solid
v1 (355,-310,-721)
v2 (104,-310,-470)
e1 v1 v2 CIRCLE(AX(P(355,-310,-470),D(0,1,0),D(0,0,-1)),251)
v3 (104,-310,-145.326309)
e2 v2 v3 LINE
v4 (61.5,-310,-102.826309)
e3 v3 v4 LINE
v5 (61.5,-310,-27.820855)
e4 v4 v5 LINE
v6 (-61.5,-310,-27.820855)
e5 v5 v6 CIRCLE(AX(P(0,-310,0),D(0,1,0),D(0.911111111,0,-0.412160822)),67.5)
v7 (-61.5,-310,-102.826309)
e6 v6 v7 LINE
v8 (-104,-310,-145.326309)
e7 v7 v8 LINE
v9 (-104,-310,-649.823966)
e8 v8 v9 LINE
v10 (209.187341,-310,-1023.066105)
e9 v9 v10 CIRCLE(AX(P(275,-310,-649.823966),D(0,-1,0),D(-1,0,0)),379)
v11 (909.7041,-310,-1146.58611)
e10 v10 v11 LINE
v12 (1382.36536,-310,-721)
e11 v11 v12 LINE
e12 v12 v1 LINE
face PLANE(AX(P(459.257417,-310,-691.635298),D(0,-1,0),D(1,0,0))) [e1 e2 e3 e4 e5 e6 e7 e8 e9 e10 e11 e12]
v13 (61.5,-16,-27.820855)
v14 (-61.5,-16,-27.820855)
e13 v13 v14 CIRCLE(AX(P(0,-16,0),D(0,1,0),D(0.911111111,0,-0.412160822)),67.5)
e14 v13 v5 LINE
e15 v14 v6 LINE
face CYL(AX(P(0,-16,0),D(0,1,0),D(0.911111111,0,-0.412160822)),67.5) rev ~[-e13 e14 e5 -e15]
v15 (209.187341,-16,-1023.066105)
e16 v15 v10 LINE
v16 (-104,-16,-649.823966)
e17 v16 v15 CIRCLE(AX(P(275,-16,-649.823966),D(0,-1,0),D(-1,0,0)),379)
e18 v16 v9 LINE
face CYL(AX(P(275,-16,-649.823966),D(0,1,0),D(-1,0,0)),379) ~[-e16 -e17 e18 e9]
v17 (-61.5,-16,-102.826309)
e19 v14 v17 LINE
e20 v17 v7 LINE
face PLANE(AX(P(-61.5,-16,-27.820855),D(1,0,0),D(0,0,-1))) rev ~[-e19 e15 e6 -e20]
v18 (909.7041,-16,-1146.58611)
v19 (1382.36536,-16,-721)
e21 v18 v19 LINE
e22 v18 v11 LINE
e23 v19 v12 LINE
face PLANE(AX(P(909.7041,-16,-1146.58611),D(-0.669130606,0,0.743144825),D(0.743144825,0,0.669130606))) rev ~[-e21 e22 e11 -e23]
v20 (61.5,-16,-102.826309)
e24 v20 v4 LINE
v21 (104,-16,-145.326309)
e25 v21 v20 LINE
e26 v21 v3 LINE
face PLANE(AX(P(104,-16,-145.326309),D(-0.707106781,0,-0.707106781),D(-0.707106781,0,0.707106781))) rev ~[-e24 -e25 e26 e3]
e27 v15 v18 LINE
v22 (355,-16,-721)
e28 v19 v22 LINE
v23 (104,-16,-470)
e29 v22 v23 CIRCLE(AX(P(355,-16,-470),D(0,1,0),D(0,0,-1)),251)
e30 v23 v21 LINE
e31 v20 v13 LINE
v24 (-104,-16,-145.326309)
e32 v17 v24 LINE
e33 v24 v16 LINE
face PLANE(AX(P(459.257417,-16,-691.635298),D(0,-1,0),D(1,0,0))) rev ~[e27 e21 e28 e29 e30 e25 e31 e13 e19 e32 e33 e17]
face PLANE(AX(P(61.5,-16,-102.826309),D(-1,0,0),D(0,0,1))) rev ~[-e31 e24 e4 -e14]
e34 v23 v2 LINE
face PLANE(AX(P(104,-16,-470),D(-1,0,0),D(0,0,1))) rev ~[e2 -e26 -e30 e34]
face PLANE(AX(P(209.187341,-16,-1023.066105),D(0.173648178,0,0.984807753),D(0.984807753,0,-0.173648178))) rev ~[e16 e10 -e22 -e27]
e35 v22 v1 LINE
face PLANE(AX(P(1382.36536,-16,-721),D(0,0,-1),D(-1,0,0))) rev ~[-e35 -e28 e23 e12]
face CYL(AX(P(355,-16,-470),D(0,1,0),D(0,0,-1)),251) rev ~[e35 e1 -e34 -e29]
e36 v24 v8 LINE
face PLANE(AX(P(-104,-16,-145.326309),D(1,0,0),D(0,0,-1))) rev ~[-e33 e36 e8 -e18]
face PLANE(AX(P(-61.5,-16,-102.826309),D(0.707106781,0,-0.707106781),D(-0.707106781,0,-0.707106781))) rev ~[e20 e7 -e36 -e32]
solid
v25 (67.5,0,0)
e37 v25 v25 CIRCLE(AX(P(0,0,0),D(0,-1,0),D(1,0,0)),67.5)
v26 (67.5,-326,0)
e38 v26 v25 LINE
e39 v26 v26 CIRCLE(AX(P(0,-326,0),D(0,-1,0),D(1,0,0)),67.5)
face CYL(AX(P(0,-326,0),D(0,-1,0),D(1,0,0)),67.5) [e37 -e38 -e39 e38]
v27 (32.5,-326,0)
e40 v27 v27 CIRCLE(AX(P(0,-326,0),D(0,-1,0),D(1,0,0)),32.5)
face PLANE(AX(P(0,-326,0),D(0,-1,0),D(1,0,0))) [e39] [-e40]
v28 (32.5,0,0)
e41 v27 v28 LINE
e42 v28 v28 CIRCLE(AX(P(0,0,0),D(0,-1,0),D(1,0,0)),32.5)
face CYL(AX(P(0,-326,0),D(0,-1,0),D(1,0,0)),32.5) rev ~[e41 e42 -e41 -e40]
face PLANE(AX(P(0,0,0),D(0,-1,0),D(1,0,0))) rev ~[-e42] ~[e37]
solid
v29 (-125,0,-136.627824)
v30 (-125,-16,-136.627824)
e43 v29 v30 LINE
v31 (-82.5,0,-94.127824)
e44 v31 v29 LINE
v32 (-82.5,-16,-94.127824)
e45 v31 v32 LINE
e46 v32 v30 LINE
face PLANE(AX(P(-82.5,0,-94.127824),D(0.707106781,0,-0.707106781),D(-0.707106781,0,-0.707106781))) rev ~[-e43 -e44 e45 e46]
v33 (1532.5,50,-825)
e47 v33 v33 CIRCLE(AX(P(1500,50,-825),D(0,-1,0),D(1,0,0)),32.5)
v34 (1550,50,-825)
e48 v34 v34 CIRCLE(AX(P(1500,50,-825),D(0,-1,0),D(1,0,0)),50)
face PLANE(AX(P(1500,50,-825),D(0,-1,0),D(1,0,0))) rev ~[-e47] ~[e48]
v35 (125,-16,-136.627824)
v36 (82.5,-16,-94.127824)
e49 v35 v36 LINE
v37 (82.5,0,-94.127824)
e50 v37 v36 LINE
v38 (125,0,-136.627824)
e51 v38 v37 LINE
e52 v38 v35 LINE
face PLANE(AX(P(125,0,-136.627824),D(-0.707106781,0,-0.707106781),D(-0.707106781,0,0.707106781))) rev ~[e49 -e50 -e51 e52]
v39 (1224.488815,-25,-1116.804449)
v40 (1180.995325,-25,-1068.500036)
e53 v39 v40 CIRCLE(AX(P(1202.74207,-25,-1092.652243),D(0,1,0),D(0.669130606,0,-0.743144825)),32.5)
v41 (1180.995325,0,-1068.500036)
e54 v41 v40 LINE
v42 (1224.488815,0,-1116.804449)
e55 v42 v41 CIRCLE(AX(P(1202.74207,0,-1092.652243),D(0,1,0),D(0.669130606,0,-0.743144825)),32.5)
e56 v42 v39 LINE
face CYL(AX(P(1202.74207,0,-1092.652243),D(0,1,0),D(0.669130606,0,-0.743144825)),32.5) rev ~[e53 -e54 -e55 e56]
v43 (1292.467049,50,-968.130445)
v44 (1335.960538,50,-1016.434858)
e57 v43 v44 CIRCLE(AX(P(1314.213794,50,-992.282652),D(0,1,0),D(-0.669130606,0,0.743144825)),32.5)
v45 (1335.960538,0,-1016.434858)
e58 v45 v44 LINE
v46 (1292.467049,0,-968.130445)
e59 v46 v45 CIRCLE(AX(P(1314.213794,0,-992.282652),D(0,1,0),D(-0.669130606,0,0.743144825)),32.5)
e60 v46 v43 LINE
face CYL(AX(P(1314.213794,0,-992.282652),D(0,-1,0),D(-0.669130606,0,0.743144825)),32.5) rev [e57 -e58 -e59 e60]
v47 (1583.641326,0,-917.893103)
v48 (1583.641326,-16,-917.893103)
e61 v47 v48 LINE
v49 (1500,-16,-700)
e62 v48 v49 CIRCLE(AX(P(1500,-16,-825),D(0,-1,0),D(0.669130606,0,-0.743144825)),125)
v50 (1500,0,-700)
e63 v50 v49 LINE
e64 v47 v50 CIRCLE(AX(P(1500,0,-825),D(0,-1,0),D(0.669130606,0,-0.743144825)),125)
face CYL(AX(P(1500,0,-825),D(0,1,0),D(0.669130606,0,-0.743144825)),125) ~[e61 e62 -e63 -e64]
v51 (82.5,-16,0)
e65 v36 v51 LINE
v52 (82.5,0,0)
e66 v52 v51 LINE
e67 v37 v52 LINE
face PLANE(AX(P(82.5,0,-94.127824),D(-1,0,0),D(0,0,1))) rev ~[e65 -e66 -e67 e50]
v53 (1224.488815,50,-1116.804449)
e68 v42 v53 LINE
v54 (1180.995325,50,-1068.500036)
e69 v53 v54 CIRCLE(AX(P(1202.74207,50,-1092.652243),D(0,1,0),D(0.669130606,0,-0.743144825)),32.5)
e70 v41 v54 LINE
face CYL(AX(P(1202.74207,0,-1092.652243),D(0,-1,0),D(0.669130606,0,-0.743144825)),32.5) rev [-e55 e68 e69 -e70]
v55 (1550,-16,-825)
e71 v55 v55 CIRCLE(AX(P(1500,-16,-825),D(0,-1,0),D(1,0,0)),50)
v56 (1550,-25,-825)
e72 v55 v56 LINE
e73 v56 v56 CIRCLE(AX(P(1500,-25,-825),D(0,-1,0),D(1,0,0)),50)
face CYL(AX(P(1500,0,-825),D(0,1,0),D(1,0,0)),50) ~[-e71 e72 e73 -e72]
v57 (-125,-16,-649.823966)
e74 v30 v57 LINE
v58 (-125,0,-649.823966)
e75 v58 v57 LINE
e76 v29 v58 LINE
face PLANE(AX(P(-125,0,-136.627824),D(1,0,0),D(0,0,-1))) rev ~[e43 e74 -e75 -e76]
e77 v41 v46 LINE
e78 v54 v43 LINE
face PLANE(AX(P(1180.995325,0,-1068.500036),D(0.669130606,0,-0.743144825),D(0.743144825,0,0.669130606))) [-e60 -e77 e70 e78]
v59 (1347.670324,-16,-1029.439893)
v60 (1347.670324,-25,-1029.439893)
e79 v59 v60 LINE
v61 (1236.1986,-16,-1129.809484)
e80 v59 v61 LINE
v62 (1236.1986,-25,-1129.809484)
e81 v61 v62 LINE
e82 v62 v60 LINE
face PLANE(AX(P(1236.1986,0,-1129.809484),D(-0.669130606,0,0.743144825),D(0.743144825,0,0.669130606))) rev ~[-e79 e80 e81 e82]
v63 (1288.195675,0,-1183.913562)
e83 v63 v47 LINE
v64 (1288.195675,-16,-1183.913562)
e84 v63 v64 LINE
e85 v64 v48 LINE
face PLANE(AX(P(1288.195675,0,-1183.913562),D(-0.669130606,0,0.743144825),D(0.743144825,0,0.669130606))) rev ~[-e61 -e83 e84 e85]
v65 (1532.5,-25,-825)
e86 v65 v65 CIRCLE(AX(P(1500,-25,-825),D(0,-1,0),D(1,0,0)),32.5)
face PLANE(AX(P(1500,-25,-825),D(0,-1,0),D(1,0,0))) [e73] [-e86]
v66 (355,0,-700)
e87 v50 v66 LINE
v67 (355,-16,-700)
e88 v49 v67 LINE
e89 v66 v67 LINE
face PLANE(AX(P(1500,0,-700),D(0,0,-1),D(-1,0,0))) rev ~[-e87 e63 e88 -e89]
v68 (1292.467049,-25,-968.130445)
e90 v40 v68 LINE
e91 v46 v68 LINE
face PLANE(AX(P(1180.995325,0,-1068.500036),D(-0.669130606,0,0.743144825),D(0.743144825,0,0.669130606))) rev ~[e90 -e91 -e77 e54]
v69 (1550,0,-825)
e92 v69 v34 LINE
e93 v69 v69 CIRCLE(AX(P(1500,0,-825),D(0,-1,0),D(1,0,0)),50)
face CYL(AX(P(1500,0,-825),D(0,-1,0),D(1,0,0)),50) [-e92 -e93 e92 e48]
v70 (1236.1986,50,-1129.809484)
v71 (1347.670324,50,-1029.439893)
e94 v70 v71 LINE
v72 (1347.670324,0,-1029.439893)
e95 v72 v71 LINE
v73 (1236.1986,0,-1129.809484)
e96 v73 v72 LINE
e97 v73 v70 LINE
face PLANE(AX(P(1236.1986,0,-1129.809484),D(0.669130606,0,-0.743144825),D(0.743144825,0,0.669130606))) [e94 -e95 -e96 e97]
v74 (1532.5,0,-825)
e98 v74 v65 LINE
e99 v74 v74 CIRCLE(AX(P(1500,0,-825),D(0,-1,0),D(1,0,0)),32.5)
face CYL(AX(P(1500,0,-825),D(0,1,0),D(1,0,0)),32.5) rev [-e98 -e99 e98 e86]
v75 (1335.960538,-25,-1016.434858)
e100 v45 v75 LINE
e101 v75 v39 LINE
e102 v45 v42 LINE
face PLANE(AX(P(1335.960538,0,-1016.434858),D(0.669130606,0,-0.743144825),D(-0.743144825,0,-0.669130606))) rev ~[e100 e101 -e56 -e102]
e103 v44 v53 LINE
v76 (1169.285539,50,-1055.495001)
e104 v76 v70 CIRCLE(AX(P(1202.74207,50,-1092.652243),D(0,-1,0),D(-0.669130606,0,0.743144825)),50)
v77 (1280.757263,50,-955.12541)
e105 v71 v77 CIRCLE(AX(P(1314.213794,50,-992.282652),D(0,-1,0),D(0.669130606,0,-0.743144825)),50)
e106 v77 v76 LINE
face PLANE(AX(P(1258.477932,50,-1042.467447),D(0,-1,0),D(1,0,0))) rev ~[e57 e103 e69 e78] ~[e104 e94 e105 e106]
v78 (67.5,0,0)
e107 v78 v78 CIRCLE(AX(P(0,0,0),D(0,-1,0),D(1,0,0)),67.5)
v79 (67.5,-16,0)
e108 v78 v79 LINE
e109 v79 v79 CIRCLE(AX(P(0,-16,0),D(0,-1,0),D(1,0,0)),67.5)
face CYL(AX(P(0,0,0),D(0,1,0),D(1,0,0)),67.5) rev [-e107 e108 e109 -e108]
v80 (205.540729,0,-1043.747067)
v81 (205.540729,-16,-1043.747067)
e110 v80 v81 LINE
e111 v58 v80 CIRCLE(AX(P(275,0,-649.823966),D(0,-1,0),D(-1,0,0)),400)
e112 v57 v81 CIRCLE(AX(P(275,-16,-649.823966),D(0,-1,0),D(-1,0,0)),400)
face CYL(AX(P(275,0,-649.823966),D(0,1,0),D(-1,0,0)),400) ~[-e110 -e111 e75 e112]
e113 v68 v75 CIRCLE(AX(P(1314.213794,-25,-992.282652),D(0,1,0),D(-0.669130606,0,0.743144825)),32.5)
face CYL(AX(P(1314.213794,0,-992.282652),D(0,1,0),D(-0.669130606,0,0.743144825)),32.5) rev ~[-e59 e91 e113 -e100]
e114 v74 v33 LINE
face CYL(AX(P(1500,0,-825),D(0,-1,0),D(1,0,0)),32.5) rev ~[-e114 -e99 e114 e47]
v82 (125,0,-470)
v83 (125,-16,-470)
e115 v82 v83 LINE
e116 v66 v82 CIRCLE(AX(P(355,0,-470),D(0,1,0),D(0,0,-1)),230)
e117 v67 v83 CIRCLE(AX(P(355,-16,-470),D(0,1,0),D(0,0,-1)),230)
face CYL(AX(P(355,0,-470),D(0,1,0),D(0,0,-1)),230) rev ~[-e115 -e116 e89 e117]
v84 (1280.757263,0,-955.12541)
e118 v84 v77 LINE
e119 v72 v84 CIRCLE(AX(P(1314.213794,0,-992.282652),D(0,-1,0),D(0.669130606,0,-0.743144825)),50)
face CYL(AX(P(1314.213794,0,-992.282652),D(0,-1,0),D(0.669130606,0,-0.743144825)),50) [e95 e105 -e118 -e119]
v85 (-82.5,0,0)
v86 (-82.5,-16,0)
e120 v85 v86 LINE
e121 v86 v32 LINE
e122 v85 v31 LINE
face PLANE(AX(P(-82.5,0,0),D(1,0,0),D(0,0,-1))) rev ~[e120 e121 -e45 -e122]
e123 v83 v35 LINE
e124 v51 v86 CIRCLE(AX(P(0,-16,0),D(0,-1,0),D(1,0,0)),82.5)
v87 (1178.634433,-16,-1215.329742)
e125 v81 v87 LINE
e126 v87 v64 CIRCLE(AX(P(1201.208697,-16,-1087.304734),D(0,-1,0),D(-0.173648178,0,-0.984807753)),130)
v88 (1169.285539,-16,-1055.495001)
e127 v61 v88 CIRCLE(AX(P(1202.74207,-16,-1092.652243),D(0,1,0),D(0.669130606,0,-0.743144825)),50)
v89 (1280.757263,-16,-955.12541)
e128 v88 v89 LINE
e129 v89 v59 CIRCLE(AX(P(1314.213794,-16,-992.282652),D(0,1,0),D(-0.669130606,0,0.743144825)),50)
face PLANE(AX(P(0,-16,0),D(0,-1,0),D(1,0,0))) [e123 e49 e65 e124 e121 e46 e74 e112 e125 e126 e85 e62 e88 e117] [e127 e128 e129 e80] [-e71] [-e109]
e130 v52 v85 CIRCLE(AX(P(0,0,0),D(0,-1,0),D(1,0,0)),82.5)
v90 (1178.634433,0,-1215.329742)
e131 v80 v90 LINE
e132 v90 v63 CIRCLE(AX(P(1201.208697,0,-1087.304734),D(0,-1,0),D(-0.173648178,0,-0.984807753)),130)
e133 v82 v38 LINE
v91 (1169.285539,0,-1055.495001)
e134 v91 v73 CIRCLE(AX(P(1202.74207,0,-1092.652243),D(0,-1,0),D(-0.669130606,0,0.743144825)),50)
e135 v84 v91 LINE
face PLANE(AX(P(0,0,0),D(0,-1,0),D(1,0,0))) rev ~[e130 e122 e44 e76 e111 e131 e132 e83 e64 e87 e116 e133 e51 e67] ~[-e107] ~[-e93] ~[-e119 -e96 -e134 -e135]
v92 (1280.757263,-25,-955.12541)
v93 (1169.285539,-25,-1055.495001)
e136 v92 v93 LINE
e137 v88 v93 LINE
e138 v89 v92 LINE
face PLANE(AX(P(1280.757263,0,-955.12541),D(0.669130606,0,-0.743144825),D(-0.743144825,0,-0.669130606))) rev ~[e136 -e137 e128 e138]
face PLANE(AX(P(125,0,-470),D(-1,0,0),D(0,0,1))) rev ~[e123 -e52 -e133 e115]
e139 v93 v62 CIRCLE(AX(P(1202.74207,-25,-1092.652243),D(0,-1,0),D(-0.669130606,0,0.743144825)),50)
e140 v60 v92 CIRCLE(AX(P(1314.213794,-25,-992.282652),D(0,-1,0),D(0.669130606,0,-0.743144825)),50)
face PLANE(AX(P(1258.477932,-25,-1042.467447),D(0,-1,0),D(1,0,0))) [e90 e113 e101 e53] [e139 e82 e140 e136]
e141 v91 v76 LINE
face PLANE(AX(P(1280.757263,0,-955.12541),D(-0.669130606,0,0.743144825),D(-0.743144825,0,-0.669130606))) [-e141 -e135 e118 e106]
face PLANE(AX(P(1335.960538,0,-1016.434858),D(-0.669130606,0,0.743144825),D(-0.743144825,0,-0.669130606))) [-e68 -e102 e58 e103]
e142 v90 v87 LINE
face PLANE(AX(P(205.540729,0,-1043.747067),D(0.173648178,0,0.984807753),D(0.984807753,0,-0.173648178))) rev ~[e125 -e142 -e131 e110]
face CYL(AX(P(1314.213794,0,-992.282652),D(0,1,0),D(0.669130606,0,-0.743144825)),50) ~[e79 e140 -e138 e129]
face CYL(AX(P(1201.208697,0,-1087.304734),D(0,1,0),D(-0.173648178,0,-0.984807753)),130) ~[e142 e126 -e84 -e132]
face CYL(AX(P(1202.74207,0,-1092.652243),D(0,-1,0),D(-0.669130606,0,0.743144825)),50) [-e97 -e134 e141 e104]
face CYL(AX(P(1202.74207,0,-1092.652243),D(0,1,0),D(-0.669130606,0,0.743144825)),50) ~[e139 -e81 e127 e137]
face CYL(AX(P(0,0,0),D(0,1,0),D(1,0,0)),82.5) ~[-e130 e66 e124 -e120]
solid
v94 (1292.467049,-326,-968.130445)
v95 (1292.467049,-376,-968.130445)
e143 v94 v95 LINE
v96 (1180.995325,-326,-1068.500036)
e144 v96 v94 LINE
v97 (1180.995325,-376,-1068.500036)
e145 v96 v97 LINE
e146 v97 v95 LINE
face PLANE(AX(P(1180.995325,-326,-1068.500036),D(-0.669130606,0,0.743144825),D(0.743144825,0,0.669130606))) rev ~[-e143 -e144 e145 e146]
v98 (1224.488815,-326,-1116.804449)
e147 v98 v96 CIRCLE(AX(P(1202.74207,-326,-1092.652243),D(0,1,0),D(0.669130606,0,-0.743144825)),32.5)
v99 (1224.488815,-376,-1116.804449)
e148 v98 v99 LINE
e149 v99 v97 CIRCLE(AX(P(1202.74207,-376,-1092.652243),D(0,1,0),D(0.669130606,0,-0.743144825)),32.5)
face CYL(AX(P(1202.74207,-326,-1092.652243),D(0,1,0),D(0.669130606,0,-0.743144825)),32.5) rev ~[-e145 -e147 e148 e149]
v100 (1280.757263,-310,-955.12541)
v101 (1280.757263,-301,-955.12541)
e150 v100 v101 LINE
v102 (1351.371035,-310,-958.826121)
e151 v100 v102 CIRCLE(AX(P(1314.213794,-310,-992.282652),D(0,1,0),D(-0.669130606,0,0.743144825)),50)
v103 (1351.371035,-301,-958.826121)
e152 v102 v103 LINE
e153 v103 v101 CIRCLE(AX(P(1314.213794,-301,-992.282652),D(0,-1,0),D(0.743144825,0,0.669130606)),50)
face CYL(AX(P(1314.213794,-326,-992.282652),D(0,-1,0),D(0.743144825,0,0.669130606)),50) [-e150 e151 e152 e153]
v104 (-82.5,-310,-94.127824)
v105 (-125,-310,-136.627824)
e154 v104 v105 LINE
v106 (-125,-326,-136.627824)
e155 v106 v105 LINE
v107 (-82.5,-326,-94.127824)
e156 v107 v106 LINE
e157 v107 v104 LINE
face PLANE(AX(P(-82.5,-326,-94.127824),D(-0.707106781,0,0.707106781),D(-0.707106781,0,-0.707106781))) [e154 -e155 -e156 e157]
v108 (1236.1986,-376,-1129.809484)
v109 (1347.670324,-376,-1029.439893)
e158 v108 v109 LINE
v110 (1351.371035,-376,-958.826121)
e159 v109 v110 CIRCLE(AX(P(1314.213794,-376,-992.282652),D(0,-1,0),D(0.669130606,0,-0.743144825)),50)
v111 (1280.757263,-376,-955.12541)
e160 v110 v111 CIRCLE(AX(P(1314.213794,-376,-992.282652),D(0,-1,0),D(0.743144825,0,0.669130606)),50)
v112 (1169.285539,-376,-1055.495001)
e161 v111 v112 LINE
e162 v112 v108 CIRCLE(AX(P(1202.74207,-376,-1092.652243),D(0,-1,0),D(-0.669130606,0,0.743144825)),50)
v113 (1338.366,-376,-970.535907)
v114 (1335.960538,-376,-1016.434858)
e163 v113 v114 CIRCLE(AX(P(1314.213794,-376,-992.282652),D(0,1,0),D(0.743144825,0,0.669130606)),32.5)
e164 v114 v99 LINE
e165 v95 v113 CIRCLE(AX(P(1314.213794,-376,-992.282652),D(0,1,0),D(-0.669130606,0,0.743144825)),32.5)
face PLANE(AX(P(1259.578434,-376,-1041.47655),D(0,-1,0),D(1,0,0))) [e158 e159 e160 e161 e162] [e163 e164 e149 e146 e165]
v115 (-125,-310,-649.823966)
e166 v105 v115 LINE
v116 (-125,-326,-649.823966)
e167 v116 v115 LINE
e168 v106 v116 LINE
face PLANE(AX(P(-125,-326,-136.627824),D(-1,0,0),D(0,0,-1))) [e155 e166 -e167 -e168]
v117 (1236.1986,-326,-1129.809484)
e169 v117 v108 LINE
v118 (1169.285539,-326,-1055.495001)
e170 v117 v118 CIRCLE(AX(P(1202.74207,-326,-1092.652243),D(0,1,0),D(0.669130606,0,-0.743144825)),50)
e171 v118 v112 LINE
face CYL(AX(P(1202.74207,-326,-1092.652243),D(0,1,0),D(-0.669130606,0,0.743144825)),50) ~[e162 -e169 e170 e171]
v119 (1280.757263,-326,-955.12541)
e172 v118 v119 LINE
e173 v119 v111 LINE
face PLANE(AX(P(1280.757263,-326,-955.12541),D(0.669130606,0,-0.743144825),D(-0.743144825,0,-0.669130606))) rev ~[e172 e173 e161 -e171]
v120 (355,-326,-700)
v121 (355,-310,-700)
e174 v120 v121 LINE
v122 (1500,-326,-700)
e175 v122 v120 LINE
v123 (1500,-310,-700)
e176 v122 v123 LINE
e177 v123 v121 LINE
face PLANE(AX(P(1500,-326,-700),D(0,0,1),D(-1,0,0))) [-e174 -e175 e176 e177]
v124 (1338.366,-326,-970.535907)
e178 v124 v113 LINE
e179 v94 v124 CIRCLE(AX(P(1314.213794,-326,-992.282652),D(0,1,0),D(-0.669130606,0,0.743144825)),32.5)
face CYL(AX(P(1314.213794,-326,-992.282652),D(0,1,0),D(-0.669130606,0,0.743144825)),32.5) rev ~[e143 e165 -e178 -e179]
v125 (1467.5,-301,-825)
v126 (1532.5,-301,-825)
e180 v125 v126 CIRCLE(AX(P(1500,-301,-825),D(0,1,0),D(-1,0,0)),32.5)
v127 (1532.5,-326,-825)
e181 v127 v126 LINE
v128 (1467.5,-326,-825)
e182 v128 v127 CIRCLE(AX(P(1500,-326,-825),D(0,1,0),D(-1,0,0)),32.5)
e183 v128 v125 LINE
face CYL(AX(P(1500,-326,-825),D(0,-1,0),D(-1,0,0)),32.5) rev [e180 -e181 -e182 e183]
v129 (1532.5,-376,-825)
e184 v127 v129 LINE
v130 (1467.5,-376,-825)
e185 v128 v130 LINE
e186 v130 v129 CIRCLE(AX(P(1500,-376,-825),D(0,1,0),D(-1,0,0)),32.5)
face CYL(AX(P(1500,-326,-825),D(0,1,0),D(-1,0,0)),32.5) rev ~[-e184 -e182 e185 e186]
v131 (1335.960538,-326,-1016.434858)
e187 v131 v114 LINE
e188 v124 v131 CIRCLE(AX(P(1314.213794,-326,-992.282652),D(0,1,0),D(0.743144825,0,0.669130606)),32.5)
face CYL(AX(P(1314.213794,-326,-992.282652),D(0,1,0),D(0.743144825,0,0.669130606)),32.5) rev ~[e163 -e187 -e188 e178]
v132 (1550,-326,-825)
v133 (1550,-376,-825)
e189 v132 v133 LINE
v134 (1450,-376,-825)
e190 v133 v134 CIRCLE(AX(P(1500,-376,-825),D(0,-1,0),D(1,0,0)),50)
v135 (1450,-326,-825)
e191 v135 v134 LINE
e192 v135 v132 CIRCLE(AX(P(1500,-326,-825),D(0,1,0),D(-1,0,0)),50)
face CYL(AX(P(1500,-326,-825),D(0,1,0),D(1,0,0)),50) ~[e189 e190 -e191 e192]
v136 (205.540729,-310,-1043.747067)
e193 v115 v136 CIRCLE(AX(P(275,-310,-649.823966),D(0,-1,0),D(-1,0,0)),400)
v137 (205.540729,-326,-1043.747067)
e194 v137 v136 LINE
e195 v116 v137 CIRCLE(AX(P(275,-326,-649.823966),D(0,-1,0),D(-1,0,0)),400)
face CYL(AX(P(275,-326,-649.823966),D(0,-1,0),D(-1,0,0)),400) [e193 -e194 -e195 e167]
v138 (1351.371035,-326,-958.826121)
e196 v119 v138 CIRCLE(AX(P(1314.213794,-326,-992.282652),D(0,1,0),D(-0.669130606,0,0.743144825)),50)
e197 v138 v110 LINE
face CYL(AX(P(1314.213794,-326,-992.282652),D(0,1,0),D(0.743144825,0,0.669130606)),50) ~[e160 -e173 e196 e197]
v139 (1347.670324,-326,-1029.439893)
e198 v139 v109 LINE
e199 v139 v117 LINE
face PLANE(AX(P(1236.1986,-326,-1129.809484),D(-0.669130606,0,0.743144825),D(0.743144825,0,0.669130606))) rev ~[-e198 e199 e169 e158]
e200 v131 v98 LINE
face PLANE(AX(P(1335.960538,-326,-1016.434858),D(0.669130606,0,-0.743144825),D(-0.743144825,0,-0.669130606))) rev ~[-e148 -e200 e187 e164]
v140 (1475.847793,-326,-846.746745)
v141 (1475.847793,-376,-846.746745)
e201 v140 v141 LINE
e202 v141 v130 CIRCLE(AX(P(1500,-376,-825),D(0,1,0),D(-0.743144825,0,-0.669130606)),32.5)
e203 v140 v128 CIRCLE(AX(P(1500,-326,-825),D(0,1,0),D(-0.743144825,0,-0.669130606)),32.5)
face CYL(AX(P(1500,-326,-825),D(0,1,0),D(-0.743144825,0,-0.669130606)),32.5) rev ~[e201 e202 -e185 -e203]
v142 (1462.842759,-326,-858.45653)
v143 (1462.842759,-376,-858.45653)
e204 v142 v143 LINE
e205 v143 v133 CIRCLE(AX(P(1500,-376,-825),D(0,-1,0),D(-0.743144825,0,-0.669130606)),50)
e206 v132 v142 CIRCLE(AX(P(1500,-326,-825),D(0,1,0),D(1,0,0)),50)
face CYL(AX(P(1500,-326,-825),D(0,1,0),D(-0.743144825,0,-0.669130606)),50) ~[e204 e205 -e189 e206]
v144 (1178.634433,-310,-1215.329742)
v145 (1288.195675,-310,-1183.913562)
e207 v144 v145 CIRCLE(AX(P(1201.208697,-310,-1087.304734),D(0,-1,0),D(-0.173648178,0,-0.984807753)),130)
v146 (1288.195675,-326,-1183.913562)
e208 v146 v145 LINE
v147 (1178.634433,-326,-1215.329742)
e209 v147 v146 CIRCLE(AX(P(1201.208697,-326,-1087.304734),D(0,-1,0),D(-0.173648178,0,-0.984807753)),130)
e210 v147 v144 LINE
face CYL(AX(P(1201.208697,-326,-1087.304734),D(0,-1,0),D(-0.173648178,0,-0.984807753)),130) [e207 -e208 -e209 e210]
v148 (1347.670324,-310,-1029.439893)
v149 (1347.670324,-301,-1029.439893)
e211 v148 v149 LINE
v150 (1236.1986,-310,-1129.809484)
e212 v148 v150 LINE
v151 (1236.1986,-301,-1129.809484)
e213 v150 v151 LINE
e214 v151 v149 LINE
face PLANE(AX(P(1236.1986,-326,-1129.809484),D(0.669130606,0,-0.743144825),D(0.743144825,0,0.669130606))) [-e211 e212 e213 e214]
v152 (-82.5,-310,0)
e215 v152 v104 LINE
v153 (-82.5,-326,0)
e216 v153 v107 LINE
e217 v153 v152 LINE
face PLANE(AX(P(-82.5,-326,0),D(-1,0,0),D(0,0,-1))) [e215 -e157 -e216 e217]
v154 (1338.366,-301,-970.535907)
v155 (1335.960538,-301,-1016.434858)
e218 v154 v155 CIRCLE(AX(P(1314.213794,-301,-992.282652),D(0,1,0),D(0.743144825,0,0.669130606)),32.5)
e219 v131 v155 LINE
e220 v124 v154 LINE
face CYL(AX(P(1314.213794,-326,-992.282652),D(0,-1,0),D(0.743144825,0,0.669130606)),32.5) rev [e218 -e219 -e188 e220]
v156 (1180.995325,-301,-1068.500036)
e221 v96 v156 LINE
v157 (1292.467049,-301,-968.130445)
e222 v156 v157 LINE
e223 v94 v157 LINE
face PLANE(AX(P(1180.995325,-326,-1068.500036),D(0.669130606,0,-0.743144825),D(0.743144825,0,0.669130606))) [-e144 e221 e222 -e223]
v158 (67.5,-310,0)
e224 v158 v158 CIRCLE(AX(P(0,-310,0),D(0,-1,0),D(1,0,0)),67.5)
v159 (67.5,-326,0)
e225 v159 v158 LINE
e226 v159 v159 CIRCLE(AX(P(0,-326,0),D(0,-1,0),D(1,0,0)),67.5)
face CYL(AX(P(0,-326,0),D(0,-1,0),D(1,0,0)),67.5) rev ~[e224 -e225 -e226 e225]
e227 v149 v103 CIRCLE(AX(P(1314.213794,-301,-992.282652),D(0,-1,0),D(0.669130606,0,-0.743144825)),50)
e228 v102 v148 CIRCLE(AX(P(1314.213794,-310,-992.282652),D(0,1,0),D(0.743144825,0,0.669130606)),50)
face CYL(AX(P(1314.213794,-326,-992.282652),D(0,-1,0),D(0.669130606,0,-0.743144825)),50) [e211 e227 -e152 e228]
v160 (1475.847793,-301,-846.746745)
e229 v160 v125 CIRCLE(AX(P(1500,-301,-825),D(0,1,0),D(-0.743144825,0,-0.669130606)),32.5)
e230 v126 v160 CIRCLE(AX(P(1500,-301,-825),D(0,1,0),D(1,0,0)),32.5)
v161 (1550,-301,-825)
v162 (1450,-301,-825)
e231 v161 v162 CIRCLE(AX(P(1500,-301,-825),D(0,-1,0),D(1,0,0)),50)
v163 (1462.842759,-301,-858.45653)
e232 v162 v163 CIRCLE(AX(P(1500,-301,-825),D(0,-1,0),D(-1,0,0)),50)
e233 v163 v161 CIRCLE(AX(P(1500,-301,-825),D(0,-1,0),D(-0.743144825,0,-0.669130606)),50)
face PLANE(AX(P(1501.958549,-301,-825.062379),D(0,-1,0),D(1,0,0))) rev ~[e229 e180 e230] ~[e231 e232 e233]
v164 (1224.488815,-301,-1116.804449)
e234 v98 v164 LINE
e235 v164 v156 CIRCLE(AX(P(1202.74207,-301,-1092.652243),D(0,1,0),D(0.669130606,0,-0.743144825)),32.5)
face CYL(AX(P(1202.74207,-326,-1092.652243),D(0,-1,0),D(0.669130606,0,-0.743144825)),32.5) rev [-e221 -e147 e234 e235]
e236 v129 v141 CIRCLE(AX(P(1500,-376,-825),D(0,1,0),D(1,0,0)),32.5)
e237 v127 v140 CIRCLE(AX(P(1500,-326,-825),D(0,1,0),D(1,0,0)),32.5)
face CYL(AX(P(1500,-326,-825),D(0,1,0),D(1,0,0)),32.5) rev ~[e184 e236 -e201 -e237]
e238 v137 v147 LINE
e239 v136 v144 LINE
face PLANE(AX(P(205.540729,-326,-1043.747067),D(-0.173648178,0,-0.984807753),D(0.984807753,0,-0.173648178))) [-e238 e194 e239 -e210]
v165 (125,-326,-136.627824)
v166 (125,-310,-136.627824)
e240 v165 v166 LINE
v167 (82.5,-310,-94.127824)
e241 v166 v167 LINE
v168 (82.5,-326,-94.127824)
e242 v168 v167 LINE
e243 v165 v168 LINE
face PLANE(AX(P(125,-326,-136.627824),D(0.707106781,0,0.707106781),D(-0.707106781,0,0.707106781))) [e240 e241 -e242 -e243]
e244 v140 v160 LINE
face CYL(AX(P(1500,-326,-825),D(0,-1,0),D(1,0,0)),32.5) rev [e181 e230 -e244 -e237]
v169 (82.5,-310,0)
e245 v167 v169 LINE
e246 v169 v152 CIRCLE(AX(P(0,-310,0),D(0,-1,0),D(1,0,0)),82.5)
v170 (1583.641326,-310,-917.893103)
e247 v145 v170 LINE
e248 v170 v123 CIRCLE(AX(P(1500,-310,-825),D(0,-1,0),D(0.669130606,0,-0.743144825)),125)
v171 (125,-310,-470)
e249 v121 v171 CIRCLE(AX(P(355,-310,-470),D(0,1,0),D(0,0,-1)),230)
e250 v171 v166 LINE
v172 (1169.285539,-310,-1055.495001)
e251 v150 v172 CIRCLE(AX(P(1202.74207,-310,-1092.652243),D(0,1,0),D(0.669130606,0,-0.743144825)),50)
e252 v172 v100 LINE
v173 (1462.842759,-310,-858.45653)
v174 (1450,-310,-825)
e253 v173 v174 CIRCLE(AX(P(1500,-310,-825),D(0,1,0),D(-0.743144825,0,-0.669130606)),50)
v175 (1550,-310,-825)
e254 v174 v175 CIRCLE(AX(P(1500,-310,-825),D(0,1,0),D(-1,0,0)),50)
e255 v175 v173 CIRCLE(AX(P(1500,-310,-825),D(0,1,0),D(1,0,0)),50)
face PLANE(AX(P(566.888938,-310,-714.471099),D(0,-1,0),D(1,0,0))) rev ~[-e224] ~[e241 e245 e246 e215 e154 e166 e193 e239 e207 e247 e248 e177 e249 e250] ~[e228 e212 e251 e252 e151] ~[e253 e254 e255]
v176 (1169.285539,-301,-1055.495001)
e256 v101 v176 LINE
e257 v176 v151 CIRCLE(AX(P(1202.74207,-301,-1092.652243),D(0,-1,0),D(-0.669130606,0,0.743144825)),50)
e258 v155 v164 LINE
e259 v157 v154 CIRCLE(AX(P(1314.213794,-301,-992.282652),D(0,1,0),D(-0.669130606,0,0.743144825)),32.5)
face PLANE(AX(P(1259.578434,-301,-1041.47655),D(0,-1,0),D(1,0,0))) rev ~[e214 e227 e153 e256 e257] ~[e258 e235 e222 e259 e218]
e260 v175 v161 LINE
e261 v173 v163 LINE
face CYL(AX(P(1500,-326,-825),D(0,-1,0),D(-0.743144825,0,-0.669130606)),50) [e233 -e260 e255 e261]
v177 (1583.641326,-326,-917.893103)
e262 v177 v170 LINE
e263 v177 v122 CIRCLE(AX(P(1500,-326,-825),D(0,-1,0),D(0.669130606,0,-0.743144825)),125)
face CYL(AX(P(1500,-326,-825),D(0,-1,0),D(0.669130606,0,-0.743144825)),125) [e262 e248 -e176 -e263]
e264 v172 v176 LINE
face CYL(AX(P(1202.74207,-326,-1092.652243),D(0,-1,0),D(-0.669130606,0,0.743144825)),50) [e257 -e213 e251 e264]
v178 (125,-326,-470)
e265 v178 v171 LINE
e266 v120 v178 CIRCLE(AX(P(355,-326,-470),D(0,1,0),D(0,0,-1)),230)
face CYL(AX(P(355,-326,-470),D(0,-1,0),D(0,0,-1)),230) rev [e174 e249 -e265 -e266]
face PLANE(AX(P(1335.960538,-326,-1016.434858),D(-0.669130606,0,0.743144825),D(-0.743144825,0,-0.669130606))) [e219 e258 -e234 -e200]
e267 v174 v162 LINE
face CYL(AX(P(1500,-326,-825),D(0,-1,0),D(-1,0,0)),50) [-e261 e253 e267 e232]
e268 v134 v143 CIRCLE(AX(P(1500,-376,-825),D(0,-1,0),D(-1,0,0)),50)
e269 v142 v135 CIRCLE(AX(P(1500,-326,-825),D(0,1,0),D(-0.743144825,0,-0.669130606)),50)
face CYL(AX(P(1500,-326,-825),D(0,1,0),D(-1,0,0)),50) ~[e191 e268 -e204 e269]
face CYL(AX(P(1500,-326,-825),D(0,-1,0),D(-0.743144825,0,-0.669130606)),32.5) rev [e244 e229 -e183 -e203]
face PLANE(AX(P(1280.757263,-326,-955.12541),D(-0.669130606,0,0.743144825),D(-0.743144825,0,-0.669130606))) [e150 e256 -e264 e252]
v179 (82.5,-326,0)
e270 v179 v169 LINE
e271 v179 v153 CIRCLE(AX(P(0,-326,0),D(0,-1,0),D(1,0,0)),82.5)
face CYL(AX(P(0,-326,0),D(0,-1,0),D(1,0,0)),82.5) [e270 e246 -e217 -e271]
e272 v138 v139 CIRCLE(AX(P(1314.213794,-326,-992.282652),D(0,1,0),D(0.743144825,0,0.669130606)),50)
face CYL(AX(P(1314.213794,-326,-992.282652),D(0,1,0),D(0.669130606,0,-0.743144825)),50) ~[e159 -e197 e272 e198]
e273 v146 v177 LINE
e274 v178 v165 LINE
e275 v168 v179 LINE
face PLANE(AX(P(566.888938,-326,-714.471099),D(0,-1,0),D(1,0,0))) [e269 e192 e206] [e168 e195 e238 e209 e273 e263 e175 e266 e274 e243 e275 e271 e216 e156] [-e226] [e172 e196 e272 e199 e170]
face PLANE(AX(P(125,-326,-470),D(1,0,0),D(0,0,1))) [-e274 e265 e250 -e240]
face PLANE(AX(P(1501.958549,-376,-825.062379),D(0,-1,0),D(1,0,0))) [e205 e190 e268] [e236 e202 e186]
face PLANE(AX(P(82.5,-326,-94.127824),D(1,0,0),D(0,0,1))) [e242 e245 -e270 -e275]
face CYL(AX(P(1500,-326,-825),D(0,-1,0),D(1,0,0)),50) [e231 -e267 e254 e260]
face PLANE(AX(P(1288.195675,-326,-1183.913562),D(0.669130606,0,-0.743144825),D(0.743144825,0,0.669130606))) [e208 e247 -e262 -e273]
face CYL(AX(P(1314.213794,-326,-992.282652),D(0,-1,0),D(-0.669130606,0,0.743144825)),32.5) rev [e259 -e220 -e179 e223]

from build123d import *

# Parameters (mm, degrees)
F0_R          = 67.5
F0_R_2        = 100
F0_R_3        = 50
F1_DEPTH      = 16
F3_R          = 67.5
F4_DEPTH      = 16
F0_R_4        = 32.5
F6_DEPTH      = 25
F6_DEPTH_BACK = 50
F3_R_2        = 50
F3_R_3        = 32.5
F7_DEPTH      = 326
F8_DEPTH      = 294
F9_DEPTH      = 50
F9_DEPTH_BACK = 25


# Not quite as in the source:
# - a feature names something its author has since deleted; it is built from what else it names


with BuildPart() as f1:
    # F0 (on Front) → F1 (new body)
    with BuildSketch(Plane.XZ):
        with BuildLine():
            ThreePointArc((-82.5, 0), (0, -82.5), (82.5, 0))
            ThreePointArc((82.5, 0), (0, 82.5), (-82.5, 0))
        make_face()
        Circle(F0_R, mode=Mode.SUBTRACT)
        with BuildLine():
            Line((82.5, -94.1278237248), (82.5, 0))
            ThreePointArc((82.5, 0), (0, -82.5), (-82.5, 0))
            Line((-82.5, 0), (-82.5, -94.1278237248))
            Line((-82.5, -94.1278237248), (-125, -136.6278237248))
            Line((-125, -136.6278237248), (-125, -649.8239662293))
            ThreePointArc((-125, -649.8239662293), (-31.4177772476, -906.9390101039), (205.5407289332, -1043.7470674342))
            Line((205.5407289332, -1043.7470674342), (1178.6344334276, -1215.3297422941))
            ThreePointArc((1178.6344334276, -1215.3297422941), (1237.0415527805, -1212.2687548745), (1288.1956753509, -1183.9135617146))
            Line((1288.1956753509, -1183.9135617146), (1583.6413257949, -917.8931031847))
            ThreePointArc((1583.6413257949, -917.8931031847), (1616.6975533122, -780.2040063068), (1500, -700))
            Line((1500, -700), (355, -700))
            ThreePointArc((355, -700), (192.3654403271, -632.6345596729), (125, -470))
            Line((125, -470), (125, -136.6278237248))
            Line((125, -136.6278237248), (82.5, -94.1278237248))
        make_face()
        with BuildLine():
            Line((1135.8290091732, -1018.3377599958), (1247.3007329948, -917.968169042))
            ThreePointArc((1247.3007329948, -917.968169042), (1388.5282761784, -925.3695909538), (1381.1268542665, -1066.5971341375))
            Line((1381.1268542665, -1066.5971341375), (1269.6551304449, -1166.9667250913))
            ThreePointArc((1269.6551304449, -1166.9667250913), (1128.4275872613, -1159.5653031794), (1135.8290091732, -1018.3377599958))
        make_face(mode=Mode.SUBTRACT)
        with Locations((1500, -825)):
            Circle(F0_R_2, mode=Mode.SUBTRACT)
        with Locations((1500, -825)):
            Circle(F0_R_2)
        with Locations((1500, -825)):
            Circle(F0_R_3, mode=Mode.SUBTRACT)
        with BuildLine():
            ThreePointArc((1381.1268542665, -1066.5971341375), (1388.5282761784, -925.3695909538), (1247.3007329948, -917.968169042))
            Line((1247.3007329948, -917.968169042), (1135.8290091732, -1018.3377599958))
            ThreePointArc((1135.8290091732, -1018.3377599958), (1128.4275872613, -1159.5653031794), (1269.6551304449, -1166.9667250913))
            Line((1269.6551304449, -1166.9667250913), (1381.1268542665, -1066.5971341375))
        make_face()
        with BuildLine():
            Line((1169.2855394911, -1055.4950012697), (1280.7572633127, -955.1254103158))
            ThreePointArc((1280.7572633127, -955.1254103158), (1351.3710349045, -958.8261212718), (1347.6703239486, -1029.4398928636))
            Line((1347.6703239486, -1029.4398928636), (1236.198600127, -1129.8094838174))
            ThreePointArc((1236.198600127, -1129.8094838174), (1165.5848285352, -1126.1087728615), (1169.2855394911, -1055.4950012697))
        make_face(mode=Mode.SUBTRACT)
    extrude(amount=F1_DEPTH)

    # F0 (on Front) → F6 (join, two sides)
    with BuildSketch(Plane.XZ) as f6_sk:
        with Locations((1500, -825)):
            Circle(F0_R_3)
        with Locations((1500, -825)):
            Circle(F0_R_4, mode=Mode.SUBTRACT)
        with BuildLine():
            ThreePointArc((1347.6703239486, -1029.4398928636), (1351.3710349045, -958.8261212718), (1280.7572633127, -955.1254103158))
            Line((1280.7572633127, -955.1254103158), (1169.2855394911, -1055.4950012697))
            ThreePointArc((1169.2855394911, -1055.4950012697), (1165.5848285352, -1126.1087728615), (1236.198600127, -1129.8094838174))
            Line((1236.198600127, -1129.8094838174), (1347.6703239486, -1029.4398928636))
        make_face()
        with BuildLine():
            ThreePointArc((1292.467048924, -968.1304447617), (1338.3660004587, -970.5359068831), (1335.9605383373, -1016.4348584177))
            Line((1335.9605383373, -1016.4348584177), (1224.4888145157, -1116.8044493716))
            ThreePointArc((1224.4888145157, -1116.8044493716), (1178.589862981, -1114.3989872502), (1180.9953251024, -1068.5000357155))
            Line((1180.9953251024, -1068.5000357155), (1292.467048924, -968.1304447617))
        make_face(mode=Mode.SUBTRACT)
    extrude(amount=F6_DEPTH)
    extrude(f6_sk.sketch, amount=-F6_DEPTH_BACK)


with BuildPart() as f4:
    # F3 (on offset) → F4 (new body)
    with BuildSketch(Plane.XZ.offset(326)):
        with BuildLine():
            Line((82.5, -94.1278237248), (82.5, 0))
            ThreePointArc((82.5, 0), (0, -82.5), (-82.5, 0))
            Line((-82.5, 0), (-82.5, -94.1278237248))
            Line((-82.5, -94.1278237248), (-125, -136.6278237248))
            Line((-125, -136.6278237248), (-125, -649.8239662293))
            ThreePointArc((-125, -649.8239662293), (-31.4177772476, -906.9390101039), (205.5407289332, -1043.7470674342))
            Line((205.5407289332, -1043.7470674342), (1178.6344334276, -1215.3297422941))
            ThreePointArc((1178.6344334276, -1215.3297422941), (1237.0415527805, -1212.2687548745), (1288.1956753509, -1183.9135617146))
            Line((1288.1956753509, -1183.9135617146), (1583.6413257949, -917.8931031847))
            ThreePointArc((1583.6413257949, -917.8931031847), (1616.6975533122, -780.2040063068), (1500, -700))
            Line((1500, -700), (355, -700))
            ThreePointArc((355, -700), (192.3654403271, -632.6345596729), (125, -470))
            Line((125, -470), (125, -136.6278237248))
            Line((125, -136.6278237248), (82.5, -94.1278237248))
        make_face()
        with BuildLine():
            ThreePointArc((1247.3007329948, -917.968169042), (1319.4473892549, -892.4196981143), (1388.5282761784, -925.3695909538))
            ThreePointArc((1388.5282761784, -925.3695909538), (1414.0767471061, -997.516247214), (1381.1268542665, -1066.5971341375))
            Line((1381.1268542665, -1066.5971341375), (1269.6551304449, -1166.9667250913))
            ThreePointArc((1269.6551304449, -1166.9667250913), (1128.4275872613, -1159.5653031794), (1135.8290091732, -1018.3377599958))
            Line((1135.8290091732, -1018.3377599958), (1247.3007329948, -917.968169042))
        make_face(mode=Mode.SUBTRACT)
        with BuildLine():
            ThreePointArc((1425.6855174523, -891.9130606359), (1406.6419573503, -860.8367949545), (1400, -825))
            ThreePointArc((1400, -825), (1500, -725), (1600, -825))
            ThreePointArc((1600, -825), (1535.8367949545, -918.3580426497), (1425.6855174523, -891.9130606359))
        make_face(mode=Mode.SUBTRACT)
        with BuildLine():
            ThreePointArc((1381.1268542665, -1066.5971341375), (1414.0767471061, -997.516247214), (1388.5282761784, -925.3695909538))
            ThreePointArc((1388.5282761784, -925.3695909538), (1319.4473892549, -892.4196981143), (1247.3007329948, -917.968169042))
            Line((1247.3007329948, -917.968169042), (1135.8290091732, -1018.3377599958))
            ThreePointArc((1135.8290091732, -1018.3377599958), (1128.4275872613, -1159.5653031794), (1269.6551304449, -1166.9667250913))
            Line((1269.6551304449, -1166.9667250913), (1381.1268542665, -1066.5971341375))
        make_face()
        with BuildLine():
            ThreePointArc((1280.7572633127, -955.1254103158), (1316.8305914428, -942.351174852), (1351.3710349045, -958.8261212718))
            ThreePointArc((1351.3710349045, -958.8261212718), (1364.1452703684, -994.8994494019), (1347.6703239486, -1029.4398928636))
            Line((1347.6703239486, -1029.4398928636), (1236.198600127, -1129.8094838174))
            ThreePointArc((1236.198600127, -1129.8094838174), (1165.5848285352, -1126.1087728615), (1169.2855394911, -1055.4950012697))
            Line((1169.2855394911, -1055.4950012697), (1280.7572633127, -955.1254103158))
        make_face(mode=Mode.SUBTRACT)
        with BuildLine():
            ThreePointArc((-82.5, 0), (0, -82.5), (82.5, 0))
            ThreePointArc((82.5, 0), (0, 82.5), (-82.5, 0))
        make_face()
        Circle(F3_R, mode=Mode.SUBTRACT)
        with BuildLine():
            Line((1400, -825), (1450, -825))
            ThreePointArc((1450, -825), (1500, -775), (1550, -825))
            ThreePointArc((1550, -825), (1517.9183974773, -871.6790213249), (1462.8427587261, -858.4565303179))
            Line((1462.8427587261, -858.4565303179), (1425.6855174523, -891.9130606359))
            ThreePointArc((1425.6855174523, -891.9130606359), (1535.8367949545, -918.3580426497), (1600, -825))
            ThreePointArc((1600, -825), (1500, -725), (1400, -825))
        make_face()
        with BuildLine():
            ThreePointArc((1462.8427587261, -858.4565303179), (1453.3209786751, -842.9183974773), (1450, -825))
            Line((1450, -825), (1400, -825))
            ThreePointArc((1400, -825), (1406.6419573503, -860.8367949545), (1425.6855174523, -891.9130606359))
            Line((1425.6855174523, -891.9130606359), (1462.8427587261, -858.4565303179))
        make_face()
    extrude(amount=-F4_DEPTH)

    # F3 (on offset) → F9 (join, two sides)
    with BuildSketch(Plane.XZ.offset(326)) as f9_sk:
        with BuildLine():
            ThreePointArc((1467.5, -825), (1500, -792.5), (1532.5, -825))
            ThreePointArc((1532.5, -825), (1511.6469583602, -855.3413638612), (1475.847793172, -846.7467447067))
            Line((1475.847793172, -846.7467447067), (1462.8427587261, -858.4565303179))
            ThreePointArc((1462.8427587261, -858.4565303179), (1517.9183974773, -871.6790213249), (1550, -825))
            ThreePointArc((1550, -825), (1500, -775), (1450, -825))
            Line((1450, -825), (1467.5, -825))
        make_face()
        with BuildLine():
            ThreePointArc((1475.847793172, -846.7467447067), (1469.6586361388, -836.6469583602), (1467.5, -825))
            Line((1467.5, -825), (1450, -825))
            ThreePointArc((1450, -825), (1453.3209786751, -842.9183974773), (1462.8427587261, -858.4565303179))
            Line((1462.8427587261, -858.4565303179), (1475.847793172, -846.7467447067))
        make_face()
        with BuildLine():
            ThreePointArc((1347.6703239486, -1029.4398928636), (1364.1452703684, -994.8994494019), (1351.3710349045, -958.8261212718))
            ThreePointArc((1351.3710349045, -958.8261212718), (1316.8305914428, -942.351174852), (1280.7572633127, -955.1254103158))
            Line((1280.7572633127, -955.1254103158), (1169.2855394911, -1055.4950012697))
            ThreePointArc((1169.2855394911, -1055.4950012697), (1165.5848285352, -1126.1087728615), (1236.198600127, -1129.8094838174))
            Line((1236.198600127, -1129.8094838174), (1347.6703239486, -1029.4398928636))
        make_face()
        with BuildLine():
            ThreePointArc((1292.467048924, -968.1304447617), (1315.9147122085, -959.8271917102), (1338.3660004587, -970.5359068831))
            ThreePointArc((1338.3660004587, -970.5359068831), (1346.6692535102, -993.9835701676), (1335.9605383373, -1016.4348584177))
            Line((1335.9605383373, -1016.4348584177), (1224.4888145157, -1116.8044493716))
            ThreePointArc((1224.4888145157, -1116.8044493716), (1178.589862981, -1114.3989872502), (1180.9953251024, -1068.5000357155))
            Line((1180.9953251024, -1068.5000357155), (1292.467048924, -968.1304447617))
        make_face(mode=Mode.SUBTRACT)
    extrude(amount=F9_DEPTH)
    extrude(f9_sk.sketch, amount=-F9_DEPTH_BACK)


with BuildPart() as f7:
    # F3 (on offset) → F7 (new body, through all)
    with BuildSketch(Plane.XZ.offset(326)):
        Circle(F3_R)
        Circle(F3_R_2, mode=Mode.SUBTRACT)
        Circle(F3_R_2)
        Circle(F3_R_3, mode=Mode.SUBTRACT)
    extrude(amount=-F7_DEPTH)


with BuildPart() as f8:
    # F5 (on face) → F8 (new body, through all)
    with BuildSketch(Plane.XZ.offset(16)):
        with BuildLine():
            Line((61.5, -102.8263085346), (61.5, -27.8208554865))
            ThreePointArc((61.5, -27.8208554865), (0, -67.5), (-61.5, -27.8208554865))
            Line((-61.5, -27.8208554865), (-61.5, -102.8263085346))
            Line((-61.5, -102.8263085346), (-104, -145.3263085346))
            Line((-104, -145.3263085346), (-104, -649.8239662293))
            ThreePointArc((-104, -649.8239662293), (-15.3308439421, -893.4404703005), (209.1873406642, -1023.0661046209))
            Line((209.1873406642, -1023.0661046209), (909.7041001333, -1146.5861097538))
            Line((909.7041001333, -1146.5861097538), (1382.3653597634, -721))
            Line((1382.3653597634, -721), (355, -721))
            ThreePointArc((355, -721), (177.5161979222, -647.4838020778), (104, -470))
            Line((104, -470), (104, -145.3263085346))
            Line((104, -145.3263085346), (61.5, -102.8263085346))
        make_face()
    extrude(amount=F8_DEPTH)


solid = Compound([f1.part, f4.part, f7.part, f8.part])
